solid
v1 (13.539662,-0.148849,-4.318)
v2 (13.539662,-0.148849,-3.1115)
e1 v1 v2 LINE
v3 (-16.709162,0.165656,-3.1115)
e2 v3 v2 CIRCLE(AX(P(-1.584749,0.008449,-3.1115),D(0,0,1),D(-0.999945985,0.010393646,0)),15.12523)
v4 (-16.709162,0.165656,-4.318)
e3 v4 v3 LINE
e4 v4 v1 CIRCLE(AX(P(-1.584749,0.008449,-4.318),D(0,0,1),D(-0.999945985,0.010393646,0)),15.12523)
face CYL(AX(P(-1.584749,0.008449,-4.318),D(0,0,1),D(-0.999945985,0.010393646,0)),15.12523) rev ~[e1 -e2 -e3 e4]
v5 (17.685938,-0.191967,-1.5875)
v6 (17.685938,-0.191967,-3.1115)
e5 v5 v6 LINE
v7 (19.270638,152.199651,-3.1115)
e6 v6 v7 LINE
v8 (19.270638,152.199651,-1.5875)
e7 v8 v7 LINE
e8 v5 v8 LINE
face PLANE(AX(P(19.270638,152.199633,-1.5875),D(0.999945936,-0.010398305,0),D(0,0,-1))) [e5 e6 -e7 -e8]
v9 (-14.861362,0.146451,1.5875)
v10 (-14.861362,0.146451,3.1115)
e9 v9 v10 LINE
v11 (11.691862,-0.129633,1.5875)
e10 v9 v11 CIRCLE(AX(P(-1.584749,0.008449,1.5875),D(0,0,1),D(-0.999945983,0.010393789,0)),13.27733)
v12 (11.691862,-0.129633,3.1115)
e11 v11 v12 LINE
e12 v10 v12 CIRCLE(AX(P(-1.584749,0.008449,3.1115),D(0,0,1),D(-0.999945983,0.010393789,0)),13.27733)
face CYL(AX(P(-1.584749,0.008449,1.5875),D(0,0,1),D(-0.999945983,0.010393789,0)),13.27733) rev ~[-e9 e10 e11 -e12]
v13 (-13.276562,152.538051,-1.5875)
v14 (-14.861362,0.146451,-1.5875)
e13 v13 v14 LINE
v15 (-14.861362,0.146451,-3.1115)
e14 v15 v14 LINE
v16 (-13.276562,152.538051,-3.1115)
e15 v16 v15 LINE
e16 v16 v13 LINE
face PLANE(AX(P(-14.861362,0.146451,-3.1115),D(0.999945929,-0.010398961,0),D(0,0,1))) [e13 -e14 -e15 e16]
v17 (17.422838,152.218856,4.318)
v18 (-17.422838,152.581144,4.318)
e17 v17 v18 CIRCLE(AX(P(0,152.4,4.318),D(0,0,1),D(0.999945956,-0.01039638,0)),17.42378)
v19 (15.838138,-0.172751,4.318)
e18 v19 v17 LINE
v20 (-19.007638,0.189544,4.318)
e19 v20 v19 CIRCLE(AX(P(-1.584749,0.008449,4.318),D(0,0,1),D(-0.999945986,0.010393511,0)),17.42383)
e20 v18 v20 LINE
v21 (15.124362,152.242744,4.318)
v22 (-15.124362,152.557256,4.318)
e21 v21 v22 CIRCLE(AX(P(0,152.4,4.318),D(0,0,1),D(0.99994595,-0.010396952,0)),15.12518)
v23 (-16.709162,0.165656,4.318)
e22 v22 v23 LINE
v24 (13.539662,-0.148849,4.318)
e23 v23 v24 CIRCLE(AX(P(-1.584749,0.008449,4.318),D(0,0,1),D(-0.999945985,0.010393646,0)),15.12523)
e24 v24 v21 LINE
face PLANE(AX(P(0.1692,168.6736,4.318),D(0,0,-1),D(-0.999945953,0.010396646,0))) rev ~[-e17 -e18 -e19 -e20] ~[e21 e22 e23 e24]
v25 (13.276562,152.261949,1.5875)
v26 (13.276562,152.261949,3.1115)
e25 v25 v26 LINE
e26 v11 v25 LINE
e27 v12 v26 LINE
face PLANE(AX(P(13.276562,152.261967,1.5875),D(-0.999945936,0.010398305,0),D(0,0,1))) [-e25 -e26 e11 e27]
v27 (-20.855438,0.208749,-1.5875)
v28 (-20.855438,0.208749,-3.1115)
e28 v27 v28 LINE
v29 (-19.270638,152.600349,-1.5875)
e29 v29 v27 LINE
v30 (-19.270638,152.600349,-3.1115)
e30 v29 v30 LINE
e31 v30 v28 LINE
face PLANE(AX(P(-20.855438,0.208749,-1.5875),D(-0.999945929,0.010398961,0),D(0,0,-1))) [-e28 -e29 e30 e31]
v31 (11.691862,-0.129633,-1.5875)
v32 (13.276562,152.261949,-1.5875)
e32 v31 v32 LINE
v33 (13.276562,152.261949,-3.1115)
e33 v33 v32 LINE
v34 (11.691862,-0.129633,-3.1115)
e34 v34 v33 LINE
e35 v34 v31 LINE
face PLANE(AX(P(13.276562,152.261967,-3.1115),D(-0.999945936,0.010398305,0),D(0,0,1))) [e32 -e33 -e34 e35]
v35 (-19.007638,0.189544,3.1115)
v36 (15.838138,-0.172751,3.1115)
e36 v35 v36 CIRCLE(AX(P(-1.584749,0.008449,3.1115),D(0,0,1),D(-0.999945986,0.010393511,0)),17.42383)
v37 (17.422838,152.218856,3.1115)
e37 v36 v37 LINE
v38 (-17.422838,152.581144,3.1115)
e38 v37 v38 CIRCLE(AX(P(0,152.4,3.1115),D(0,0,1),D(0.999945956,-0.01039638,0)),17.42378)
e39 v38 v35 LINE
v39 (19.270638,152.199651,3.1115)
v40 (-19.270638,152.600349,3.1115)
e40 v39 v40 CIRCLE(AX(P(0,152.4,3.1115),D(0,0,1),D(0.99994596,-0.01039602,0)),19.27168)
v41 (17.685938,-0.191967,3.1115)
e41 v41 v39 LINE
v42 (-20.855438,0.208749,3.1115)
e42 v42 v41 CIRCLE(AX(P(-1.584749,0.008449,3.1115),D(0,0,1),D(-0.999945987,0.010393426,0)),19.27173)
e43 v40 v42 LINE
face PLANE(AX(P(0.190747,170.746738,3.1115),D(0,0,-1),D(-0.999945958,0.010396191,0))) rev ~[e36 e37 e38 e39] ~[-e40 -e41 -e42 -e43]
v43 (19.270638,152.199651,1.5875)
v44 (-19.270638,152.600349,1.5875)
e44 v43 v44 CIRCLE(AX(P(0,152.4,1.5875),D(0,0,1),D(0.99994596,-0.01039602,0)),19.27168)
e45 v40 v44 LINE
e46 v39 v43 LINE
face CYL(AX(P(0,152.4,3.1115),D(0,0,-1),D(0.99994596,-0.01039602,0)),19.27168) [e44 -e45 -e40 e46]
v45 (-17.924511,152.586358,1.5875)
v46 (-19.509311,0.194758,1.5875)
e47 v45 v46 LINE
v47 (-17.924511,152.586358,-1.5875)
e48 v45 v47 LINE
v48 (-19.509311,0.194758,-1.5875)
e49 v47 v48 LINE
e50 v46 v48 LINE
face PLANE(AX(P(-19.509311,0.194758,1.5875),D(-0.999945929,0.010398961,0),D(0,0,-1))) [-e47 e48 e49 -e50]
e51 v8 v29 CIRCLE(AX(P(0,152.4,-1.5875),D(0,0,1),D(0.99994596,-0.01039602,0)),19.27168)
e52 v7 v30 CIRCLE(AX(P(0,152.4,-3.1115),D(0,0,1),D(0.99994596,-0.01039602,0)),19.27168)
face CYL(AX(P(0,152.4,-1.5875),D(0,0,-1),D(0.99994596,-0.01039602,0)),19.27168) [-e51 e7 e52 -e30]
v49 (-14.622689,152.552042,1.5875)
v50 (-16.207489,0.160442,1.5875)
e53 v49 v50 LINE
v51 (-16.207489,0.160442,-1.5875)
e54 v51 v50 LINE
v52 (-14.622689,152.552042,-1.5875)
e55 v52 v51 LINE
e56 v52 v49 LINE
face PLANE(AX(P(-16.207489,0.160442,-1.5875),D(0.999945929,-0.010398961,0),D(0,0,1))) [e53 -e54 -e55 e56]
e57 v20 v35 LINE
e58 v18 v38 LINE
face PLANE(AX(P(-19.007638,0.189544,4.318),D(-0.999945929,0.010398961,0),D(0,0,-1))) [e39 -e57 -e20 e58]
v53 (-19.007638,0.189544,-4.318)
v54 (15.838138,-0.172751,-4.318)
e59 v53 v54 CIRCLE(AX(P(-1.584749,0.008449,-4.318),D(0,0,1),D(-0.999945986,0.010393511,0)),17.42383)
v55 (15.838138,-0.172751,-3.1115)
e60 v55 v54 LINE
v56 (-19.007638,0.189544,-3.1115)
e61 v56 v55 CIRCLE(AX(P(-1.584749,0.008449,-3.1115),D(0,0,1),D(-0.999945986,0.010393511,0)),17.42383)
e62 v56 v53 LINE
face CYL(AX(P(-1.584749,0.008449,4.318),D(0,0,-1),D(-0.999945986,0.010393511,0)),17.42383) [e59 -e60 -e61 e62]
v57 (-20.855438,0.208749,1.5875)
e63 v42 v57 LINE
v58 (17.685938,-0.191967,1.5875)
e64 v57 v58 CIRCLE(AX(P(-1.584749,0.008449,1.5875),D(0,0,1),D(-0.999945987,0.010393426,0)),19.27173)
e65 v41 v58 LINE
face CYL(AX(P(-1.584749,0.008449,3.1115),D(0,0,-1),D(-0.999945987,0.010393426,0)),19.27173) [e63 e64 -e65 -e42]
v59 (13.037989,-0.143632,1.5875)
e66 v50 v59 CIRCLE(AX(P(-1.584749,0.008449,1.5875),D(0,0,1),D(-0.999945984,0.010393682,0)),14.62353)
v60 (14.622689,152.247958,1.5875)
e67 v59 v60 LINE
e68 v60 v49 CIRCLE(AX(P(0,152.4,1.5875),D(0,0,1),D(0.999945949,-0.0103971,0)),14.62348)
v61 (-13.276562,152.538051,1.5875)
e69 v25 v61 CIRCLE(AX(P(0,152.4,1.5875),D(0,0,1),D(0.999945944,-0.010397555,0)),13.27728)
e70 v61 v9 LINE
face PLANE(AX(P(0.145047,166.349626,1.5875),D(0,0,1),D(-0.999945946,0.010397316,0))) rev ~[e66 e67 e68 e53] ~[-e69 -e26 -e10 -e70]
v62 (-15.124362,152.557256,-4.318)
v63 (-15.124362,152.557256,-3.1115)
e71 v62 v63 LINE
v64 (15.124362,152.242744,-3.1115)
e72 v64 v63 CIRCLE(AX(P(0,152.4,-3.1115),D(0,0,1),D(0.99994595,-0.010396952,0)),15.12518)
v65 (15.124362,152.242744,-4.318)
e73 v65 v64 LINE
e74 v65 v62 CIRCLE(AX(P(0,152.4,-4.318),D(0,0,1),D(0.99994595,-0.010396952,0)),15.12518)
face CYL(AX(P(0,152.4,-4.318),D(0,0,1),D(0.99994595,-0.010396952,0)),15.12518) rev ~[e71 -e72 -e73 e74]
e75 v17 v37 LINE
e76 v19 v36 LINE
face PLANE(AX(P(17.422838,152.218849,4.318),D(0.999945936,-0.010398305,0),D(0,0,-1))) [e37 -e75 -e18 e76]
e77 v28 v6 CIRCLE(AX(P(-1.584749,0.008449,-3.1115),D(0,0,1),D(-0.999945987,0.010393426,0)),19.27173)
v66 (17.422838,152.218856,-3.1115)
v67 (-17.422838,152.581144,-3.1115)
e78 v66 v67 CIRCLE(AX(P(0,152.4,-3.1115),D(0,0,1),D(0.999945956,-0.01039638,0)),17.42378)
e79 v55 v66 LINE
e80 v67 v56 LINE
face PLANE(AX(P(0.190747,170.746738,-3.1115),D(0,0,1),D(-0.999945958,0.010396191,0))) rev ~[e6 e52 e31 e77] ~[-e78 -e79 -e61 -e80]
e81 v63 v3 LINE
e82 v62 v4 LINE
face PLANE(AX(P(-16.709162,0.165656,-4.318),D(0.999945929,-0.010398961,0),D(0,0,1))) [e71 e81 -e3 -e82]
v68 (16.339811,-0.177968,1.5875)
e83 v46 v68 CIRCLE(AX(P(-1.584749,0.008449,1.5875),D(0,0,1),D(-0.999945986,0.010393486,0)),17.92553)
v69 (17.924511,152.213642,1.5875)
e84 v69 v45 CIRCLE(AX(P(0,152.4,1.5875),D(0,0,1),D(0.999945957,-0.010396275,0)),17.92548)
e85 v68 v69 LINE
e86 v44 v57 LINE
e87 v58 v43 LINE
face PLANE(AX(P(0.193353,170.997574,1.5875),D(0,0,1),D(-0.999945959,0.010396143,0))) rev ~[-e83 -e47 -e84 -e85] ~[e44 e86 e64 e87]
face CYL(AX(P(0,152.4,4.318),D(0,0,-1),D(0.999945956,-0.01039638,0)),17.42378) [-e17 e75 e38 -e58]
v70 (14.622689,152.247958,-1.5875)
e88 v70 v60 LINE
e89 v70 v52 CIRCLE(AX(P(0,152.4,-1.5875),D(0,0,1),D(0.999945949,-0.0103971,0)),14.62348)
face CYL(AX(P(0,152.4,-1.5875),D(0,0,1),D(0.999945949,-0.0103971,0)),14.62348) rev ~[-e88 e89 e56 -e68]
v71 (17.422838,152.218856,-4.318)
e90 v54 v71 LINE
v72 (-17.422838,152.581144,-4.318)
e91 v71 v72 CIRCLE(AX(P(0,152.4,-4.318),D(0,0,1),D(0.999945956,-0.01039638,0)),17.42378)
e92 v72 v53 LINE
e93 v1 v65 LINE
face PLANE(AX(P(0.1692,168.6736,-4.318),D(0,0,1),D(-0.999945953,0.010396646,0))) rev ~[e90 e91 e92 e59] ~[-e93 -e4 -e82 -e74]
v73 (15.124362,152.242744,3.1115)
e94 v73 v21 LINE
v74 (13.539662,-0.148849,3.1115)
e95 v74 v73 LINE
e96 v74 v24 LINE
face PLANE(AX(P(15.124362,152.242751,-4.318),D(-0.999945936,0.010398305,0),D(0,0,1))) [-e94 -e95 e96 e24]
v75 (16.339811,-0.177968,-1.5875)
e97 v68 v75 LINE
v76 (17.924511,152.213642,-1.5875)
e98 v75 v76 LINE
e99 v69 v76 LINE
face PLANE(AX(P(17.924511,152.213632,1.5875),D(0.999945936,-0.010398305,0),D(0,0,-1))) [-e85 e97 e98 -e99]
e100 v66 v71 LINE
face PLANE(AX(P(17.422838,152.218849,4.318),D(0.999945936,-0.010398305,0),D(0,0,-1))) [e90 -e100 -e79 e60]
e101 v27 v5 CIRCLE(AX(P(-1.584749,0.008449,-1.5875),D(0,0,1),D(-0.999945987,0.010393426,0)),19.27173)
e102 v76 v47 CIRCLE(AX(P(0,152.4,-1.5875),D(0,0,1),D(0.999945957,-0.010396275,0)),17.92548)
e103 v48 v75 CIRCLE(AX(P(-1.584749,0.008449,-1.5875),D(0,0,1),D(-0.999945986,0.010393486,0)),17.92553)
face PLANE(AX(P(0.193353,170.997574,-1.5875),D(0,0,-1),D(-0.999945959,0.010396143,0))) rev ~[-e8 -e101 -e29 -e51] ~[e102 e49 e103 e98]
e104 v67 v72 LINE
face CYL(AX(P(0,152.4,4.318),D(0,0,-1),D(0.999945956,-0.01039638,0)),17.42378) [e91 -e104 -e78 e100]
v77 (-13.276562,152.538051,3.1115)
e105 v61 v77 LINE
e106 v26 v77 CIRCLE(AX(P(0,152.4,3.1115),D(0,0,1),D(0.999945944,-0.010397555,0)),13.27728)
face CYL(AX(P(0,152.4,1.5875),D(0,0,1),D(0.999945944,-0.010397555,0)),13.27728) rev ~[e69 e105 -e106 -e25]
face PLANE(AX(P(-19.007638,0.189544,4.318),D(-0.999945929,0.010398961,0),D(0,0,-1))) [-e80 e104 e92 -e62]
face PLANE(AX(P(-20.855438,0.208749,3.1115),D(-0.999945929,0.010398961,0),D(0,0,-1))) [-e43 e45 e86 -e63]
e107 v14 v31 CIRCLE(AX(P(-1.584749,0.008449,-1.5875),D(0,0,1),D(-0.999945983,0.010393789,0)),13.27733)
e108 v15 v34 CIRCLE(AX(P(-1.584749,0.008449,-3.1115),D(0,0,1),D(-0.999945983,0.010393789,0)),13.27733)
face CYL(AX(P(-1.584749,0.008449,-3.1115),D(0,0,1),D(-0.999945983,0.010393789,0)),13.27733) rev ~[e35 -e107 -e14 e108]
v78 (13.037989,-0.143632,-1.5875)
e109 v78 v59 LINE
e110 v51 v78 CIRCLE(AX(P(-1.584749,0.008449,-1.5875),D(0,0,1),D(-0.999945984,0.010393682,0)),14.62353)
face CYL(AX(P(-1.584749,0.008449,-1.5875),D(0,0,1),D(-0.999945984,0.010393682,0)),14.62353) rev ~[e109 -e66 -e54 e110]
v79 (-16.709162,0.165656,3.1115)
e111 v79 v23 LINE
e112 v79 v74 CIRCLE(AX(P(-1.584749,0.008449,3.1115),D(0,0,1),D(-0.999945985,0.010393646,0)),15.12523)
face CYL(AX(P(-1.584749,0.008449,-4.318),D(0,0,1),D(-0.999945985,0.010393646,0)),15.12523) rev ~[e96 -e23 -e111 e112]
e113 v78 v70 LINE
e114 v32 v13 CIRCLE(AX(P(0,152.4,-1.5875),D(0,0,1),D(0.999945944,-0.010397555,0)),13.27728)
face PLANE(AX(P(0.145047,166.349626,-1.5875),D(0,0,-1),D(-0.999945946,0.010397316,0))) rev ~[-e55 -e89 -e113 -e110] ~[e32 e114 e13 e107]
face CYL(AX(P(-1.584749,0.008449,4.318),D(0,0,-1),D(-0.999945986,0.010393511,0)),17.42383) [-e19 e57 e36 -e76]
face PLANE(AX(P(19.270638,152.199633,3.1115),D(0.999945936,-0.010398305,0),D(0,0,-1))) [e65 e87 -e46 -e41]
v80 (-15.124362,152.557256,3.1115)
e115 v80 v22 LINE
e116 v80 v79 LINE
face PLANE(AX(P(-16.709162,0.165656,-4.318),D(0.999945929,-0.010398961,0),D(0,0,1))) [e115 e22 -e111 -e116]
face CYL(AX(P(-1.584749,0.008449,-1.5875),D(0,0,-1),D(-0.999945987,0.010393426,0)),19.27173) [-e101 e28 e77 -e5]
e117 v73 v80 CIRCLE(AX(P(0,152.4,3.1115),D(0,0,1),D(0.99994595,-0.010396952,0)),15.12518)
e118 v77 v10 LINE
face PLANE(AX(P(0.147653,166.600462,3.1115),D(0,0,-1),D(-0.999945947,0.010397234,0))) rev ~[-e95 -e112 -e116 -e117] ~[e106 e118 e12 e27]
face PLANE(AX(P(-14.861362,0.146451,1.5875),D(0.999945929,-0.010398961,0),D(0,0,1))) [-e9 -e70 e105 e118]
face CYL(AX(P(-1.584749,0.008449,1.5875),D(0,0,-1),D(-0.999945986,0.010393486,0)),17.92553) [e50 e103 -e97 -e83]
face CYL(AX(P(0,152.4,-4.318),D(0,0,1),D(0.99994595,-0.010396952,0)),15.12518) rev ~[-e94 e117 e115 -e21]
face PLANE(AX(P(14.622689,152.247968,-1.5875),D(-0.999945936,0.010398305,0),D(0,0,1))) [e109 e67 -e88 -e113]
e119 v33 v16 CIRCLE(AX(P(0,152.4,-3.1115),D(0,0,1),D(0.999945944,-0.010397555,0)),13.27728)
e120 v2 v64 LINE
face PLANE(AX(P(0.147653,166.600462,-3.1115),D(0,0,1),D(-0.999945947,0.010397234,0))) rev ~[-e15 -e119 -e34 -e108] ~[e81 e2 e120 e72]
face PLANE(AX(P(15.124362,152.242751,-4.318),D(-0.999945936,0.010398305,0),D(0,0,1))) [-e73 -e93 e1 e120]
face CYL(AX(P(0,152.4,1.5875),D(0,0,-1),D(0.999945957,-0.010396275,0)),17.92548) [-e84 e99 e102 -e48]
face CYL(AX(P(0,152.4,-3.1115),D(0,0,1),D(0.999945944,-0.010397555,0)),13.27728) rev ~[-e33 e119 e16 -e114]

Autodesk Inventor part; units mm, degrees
ref_plane "Work Plane2" through (-1.5848, 0.0084, 0) normal (-1, 0, 0) x (0, 0, 1)
ref_plane "Work Plane3" through (0, 152.4, 0) normal (-0.3826834, -0.9238795, 0) x (0, 0, 1)
sketch "Path" plane through (0, 0, 0) normal (0, 0, 1) x (1, 0, 0)
  arc A0 (-17.8584, 0.1776) -> (14.6889, -0.1608) centre (-1.5848, 0.0084) ccw
  arc A1 (16.2736, 152.2308) -> (-16.2736, 152.5692) centre (0, 152.4) ccw
  line L0 (16.2736, 152.2308) -> (14.6889, -0.1608)
  line L1 (-17.8584, 0.1776) -> (-16.2736, 152.5692)
  dimension "d31" = 5.9944
ref_plane "Section Plane" through (14.6889, -0.1608, 0) normal (0.0103987, 0.9999459, 0) x (0, 0, 1)
sketch "Section Sketch" plane through (14.6889, -0.1608, 0) normal (0.0103987, 0.9999459, 0) x (0, 0, 1)
  line L0 (-4.318, -1.1493) -> (4.318, -1.1493)
  line L1 (4.318, -1.1493) -> (4.318, 1.1493)
  line L2 (4.318, 1.1493) -> (-4.318, 1.1493)
  line L3 (-4.318, 1.1493) -> (-4.318, -1.1493)
  line L4 (-1.5875, -1.651) -> (1.5875, -1.651)
  line L5 (1.5875, -1.651) -> (1.5875, 1.651)
  line L6 (1.5875, 1.651) -> (-1.5875, 1.651)
  line L7 (-1.5875, 1.651) -> (-1.5875, -1.651)
  line L8 (-1.5875, 0) -> (1.5875, 0) construction
  line L9 (-3.1115, -2.9972) -> (-1.5875, -2.9972)
  line L10 (-1.5875, -2.9972) -> (-1.5875, 2.9972)
  line L11 (-1.5875, 2.9972) -> (-3.1115, 2.9972)
  line L12 (-3.1115, 2.9972) -> (-3.1115, -2.9972)
  line L13 (1.5875, -2.9972) -> (3.1115, -2.9972)
  line L14 (3.1115, -2.9972) -> (3.1115, 2.9972)
  line L15 (3.1115, 2.9972) -> (1.5875, 2.9972)
  line L16 (1.5875, 2.9972) -> (1.5875, -2.9972)
  line L17 (-4.318, 0) -> (4.318, 0) construction
  point P0 (0, 0)
  point P1 (0, 0)
  dimension "d21" = 2.2987
  dimension "d22" = 3.302
  dimension "d23" = 3.175
  dimension "d24" = 1.524
  dimension "d31" = 5.9944
  dimension "d32" = 8.636
sweep "Solid" add profiles "Section Sketch" path "Path"
pattern_of_one "Strand Pattern"
equation "\"d21\" = da_d2"
equation "\"d22\" = da_d1"
equation "\"d23\" = da_b1"
equation "\"d24\" = da_t1 + da_t2"
equation "\"d30\" = da_pt"
equation "\"da_p\" = 6.35"
equation "\"da_b1\" = 3.175"
equation "\"da_h2\" = 5.9944"
equation "\"da_h3\" = 5.207"
equation "\"da_d1\" = 3.302"
equation "\"da_d2\" = 2.2987"
equation "\"da_pt\" = 6.4008"
equation "\"da_b\" = 8.636"
equation "\"da_t1\" = 0.762"
equation "\"da_t2\" = 0.762"
properties part number "Roller Chain"
